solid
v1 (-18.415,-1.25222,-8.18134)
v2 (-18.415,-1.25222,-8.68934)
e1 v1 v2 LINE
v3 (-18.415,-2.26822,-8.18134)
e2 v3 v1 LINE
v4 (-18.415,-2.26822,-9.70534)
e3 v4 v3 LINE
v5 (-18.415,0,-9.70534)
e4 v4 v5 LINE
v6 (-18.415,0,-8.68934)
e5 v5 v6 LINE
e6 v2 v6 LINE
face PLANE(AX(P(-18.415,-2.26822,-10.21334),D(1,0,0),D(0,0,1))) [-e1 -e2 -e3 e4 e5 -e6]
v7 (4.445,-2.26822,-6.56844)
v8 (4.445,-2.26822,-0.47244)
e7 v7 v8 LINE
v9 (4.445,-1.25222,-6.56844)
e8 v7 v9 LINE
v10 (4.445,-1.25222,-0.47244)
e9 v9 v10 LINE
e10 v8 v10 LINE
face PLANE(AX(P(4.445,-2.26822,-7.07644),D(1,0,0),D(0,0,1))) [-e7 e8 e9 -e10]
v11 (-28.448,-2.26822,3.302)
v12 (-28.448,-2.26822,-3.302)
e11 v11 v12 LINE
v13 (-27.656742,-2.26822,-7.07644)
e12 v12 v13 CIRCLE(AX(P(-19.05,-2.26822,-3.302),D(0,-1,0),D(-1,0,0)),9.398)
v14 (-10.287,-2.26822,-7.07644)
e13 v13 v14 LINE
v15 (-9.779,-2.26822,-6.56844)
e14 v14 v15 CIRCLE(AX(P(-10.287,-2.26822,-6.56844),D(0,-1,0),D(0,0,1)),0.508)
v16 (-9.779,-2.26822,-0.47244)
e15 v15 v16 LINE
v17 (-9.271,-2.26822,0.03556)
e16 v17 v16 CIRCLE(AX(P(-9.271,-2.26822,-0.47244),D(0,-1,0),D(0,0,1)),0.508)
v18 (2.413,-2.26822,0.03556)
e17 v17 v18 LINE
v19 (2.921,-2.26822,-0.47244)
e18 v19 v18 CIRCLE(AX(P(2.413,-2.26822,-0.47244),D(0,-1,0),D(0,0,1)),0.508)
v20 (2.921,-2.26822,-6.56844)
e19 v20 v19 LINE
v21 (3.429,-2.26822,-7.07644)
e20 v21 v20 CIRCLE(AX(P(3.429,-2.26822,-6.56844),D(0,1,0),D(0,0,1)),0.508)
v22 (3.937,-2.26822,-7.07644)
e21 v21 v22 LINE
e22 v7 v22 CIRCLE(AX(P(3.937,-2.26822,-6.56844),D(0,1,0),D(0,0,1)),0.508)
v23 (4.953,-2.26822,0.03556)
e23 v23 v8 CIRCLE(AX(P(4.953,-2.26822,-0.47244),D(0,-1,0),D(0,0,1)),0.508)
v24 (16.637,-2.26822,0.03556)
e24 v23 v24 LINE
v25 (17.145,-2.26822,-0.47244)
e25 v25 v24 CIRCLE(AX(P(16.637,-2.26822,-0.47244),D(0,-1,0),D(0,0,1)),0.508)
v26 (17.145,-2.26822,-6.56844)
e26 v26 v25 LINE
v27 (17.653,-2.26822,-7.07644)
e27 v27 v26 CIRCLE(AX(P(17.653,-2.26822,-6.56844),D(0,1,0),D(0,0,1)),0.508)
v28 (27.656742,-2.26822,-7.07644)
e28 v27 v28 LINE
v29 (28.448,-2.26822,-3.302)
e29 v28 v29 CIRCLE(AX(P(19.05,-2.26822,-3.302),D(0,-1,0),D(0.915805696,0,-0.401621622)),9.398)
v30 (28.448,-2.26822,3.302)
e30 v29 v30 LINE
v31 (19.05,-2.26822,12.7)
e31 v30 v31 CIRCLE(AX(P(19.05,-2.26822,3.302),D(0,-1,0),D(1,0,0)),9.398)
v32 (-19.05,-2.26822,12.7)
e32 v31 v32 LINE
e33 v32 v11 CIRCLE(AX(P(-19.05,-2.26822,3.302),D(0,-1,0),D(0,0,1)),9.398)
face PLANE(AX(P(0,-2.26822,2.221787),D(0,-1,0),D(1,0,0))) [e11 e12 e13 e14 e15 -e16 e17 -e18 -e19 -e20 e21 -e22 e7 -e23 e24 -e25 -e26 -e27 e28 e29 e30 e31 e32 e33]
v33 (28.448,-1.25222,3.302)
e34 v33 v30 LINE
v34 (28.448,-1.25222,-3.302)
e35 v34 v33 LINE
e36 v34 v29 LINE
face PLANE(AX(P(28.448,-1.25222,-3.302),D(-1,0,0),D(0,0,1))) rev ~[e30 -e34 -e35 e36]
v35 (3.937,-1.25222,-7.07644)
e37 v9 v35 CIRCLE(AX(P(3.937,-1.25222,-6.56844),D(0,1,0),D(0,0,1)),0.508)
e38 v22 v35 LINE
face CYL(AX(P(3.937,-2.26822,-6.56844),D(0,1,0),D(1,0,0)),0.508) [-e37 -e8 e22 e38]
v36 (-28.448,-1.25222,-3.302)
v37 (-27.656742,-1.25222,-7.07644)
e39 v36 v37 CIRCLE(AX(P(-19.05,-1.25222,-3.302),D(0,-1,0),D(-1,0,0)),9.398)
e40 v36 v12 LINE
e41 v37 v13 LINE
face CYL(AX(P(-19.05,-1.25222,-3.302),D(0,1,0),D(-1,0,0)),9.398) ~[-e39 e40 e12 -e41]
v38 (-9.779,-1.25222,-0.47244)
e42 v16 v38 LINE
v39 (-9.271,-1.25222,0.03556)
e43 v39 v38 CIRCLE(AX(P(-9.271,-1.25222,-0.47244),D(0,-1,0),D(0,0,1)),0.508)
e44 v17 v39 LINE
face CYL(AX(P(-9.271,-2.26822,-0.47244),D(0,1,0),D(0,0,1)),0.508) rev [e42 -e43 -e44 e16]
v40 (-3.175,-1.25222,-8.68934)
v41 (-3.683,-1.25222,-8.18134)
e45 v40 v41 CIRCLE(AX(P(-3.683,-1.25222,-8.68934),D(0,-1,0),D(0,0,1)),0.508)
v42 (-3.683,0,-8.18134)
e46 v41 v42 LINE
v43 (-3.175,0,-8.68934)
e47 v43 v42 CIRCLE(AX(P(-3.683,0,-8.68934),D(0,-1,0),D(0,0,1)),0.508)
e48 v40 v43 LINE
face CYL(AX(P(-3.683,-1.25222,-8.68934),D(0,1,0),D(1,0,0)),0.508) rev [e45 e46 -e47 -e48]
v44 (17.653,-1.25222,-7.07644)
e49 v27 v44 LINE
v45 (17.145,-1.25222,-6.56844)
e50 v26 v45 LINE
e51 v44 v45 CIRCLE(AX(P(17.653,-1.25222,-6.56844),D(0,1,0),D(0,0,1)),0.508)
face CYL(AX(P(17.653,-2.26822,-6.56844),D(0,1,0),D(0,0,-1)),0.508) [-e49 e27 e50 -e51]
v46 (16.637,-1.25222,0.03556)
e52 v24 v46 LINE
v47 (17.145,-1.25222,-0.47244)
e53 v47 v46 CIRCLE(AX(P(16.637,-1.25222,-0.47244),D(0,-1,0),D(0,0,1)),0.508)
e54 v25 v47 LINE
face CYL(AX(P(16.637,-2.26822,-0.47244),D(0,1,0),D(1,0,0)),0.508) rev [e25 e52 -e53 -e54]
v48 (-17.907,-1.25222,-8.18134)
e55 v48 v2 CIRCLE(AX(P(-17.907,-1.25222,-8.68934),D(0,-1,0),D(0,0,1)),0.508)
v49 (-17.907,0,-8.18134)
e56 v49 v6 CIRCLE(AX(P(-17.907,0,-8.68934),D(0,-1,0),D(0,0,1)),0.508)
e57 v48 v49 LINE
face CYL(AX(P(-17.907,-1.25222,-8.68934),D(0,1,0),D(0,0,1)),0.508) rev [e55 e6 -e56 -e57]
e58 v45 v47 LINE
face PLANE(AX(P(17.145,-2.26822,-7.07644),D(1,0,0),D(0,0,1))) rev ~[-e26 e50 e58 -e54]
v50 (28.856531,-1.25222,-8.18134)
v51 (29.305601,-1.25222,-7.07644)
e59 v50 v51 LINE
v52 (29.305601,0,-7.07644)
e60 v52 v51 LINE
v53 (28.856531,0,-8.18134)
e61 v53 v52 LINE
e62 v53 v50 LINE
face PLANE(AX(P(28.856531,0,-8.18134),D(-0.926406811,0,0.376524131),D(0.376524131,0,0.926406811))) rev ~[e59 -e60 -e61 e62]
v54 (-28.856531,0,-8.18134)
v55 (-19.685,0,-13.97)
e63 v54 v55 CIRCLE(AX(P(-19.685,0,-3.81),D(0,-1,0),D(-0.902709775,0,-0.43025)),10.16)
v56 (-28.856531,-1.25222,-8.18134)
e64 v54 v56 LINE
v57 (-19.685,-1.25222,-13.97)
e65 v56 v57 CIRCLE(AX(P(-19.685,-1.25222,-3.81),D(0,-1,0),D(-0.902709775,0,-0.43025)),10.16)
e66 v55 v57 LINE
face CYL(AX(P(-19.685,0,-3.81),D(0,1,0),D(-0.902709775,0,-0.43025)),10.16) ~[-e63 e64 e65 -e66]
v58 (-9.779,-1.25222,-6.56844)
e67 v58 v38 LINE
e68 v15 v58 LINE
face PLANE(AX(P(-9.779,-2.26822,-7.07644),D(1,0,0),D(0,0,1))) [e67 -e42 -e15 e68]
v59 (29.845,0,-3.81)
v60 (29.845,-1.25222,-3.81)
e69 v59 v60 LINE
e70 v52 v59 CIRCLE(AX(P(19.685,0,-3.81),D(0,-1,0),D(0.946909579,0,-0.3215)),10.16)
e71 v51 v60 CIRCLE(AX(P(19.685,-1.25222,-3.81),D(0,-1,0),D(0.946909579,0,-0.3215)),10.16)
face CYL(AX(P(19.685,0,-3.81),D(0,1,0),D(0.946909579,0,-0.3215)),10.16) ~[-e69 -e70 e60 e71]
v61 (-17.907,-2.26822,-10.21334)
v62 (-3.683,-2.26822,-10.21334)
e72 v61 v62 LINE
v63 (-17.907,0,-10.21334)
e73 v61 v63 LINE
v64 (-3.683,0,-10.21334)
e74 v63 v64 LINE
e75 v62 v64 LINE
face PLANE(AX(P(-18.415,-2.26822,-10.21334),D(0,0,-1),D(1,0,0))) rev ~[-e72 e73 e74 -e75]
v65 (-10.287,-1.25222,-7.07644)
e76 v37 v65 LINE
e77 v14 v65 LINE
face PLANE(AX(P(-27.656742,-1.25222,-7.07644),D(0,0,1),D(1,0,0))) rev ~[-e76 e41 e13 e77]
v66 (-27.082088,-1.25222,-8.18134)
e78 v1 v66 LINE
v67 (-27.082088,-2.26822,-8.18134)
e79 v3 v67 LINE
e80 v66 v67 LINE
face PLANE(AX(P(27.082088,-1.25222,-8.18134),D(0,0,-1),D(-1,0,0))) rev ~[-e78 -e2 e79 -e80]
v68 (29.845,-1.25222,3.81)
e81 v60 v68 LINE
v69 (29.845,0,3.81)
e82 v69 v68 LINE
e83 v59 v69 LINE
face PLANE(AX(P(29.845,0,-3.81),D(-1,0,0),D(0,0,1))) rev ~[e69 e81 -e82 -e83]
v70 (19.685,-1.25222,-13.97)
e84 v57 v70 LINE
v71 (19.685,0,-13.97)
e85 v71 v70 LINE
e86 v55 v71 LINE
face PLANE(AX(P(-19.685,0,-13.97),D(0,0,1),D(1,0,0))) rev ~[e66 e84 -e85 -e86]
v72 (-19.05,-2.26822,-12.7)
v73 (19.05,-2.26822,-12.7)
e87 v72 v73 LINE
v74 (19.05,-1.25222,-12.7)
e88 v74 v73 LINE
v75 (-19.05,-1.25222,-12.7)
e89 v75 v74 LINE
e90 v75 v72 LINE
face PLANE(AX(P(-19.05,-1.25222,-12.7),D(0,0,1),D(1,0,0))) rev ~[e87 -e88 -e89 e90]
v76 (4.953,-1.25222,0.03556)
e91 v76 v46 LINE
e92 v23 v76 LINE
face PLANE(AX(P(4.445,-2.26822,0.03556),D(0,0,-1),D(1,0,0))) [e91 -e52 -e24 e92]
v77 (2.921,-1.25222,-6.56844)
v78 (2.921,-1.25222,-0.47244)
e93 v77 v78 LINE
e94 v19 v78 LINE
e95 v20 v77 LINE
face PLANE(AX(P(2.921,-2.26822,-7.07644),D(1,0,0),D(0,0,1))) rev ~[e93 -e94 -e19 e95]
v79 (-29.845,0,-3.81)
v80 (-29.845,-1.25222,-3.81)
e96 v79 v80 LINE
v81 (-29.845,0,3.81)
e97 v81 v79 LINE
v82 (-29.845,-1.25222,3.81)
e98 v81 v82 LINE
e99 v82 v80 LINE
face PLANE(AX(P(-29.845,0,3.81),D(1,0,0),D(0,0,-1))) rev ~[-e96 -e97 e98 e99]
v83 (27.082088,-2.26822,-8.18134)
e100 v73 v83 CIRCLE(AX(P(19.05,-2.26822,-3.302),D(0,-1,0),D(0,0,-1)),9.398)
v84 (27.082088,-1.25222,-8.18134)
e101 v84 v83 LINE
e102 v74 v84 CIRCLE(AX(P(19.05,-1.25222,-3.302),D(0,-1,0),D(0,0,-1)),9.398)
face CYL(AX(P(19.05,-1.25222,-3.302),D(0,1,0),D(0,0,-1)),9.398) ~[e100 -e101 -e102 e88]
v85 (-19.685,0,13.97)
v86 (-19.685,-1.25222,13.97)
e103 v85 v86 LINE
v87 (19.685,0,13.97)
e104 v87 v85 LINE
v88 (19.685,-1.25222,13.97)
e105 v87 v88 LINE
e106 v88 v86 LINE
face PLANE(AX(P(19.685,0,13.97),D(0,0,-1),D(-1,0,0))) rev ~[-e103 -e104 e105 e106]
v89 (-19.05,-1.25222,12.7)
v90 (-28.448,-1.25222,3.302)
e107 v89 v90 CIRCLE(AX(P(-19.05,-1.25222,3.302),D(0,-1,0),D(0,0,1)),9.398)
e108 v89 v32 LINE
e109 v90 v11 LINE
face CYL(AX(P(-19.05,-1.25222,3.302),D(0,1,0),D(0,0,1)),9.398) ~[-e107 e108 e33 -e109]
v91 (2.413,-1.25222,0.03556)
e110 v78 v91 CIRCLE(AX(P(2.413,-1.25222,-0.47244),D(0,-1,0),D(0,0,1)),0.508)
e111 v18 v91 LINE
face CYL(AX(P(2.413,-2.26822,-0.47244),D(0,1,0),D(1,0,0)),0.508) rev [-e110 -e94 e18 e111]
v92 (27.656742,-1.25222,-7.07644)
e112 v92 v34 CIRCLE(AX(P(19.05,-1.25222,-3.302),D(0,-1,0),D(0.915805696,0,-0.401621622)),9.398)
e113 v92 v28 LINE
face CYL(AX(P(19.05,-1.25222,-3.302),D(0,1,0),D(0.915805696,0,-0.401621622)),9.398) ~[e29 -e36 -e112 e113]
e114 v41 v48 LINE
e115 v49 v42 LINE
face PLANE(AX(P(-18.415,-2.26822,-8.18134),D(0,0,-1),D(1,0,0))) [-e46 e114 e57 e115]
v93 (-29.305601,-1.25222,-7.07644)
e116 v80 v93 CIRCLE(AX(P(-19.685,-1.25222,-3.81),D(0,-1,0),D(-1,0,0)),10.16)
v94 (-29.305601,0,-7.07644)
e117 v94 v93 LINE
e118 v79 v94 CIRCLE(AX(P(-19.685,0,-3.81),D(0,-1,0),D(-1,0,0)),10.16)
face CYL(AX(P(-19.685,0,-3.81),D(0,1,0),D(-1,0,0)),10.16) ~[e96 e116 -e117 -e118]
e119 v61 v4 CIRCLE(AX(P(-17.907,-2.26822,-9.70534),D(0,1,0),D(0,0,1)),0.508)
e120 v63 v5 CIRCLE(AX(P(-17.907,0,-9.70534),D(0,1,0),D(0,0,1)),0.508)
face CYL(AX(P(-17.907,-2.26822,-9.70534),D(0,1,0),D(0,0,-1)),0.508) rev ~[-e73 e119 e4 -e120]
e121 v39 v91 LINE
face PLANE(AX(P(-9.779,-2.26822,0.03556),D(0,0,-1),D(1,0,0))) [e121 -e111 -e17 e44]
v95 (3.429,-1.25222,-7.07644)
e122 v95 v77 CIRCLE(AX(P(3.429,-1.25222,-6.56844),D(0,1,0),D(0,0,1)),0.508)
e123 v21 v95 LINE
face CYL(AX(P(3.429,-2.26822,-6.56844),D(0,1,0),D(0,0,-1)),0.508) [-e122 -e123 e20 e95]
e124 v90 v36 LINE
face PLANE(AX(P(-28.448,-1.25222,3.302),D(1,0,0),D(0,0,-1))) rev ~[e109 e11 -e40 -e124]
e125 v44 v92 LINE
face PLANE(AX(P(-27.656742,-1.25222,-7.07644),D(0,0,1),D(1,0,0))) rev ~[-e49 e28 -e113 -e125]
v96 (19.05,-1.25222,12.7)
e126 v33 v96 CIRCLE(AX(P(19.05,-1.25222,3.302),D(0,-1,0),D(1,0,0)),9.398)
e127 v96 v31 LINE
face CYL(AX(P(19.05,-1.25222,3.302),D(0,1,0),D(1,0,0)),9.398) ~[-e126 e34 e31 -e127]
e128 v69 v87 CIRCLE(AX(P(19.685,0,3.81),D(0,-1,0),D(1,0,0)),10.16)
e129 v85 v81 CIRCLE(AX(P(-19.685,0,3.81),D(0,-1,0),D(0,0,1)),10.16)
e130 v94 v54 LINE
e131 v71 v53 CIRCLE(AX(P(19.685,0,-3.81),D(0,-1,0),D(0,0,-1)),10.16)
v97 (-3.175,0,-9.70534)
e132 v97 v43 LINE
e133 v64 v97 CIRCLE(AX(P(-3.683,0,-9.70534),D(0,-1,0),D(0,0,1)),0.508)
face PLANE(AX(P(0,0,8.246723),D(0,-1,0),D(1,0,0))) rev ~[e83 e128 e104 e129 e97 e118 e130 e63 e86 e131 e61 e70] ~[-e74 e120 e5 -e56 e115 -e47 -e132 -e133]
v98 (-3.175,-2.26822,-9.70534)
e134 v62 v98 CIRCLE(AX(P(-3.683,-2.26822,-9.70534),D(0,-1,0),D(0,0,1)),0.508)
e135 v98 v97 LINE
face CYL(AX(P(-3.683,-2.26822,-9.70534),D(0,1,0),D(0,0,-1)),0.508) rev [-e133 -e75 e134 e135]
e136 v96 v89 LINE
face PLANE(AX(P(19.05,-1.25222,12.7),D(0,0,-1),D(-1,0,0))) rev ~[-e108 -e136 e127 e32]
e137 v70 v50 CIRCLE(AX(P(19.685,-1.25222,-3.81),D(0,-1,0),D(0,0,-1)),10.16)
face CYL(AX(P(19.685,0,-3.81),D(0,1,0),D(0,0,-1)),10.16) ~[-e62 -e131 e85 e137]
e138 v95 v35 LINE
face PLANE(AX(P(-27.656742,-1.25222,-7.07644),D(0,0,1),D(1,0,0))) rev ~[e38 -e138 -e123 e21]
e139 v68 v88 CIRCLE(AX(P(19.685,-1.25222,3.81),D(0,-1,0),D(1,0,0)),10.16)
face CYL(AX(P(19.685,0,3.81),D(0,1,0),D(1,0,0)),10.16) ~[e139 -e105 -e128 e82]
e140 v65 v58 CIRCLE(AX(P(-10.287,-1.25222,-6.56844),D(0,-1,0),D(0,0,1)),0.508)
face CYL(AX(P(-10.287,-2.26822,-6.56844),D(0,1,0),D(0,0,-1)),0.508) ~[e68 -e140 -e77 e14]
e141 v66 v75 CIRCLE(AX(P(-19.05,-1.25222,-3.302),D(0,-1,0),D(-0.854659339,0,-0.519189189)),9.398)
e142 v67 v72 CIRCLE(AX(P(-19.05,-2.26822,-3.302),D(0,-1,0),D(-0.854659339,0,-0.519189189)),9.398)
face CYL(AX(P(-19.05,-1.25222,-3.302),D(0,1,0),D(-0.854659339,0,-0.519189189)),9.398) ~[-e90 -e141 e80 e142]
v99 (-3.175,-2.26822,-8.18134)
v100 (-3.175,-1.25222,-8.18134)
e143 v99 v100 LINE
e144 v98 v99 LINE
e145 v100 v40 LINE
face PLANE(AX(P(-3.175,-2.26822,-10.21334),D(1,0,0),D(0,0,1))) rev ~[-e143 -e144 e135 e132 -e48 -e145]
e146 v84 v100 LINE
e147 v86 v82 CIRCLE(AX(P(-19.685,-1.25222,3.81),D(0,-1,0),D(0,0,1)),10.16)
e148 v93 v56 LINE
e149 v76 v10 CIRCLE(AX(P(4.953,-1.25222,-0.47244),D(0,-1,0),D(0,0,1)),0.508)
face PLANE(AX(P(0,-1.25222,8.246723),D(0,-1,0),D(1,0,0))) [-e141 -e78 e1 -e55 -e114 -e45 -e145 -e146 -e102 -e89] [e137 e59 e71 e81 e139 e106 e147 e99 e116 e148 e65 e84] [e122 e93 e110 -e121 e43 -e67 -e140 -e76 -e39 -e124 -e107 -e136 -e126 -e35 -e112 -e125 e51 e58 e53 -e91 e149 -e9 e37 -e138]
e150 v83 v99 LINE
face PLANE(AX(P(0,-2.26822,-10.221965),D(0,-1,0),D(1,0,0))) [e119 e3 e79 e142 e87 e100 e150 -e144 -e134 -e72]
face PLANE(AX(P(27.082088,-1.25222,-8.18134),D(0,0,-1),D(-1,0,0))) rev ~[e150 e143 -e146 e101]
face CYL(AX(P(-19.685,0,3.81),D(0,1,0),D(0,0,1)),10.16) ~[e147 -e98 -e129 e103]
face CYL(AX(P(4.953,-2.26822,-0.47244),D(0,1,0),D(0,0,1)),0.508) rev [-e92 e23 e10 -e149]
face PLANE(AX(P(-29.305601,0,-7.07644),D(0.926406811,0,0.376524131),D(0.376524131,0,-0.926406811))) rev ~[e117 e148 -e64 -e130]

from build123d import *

# Parameters (mm, degrees)
F1_DEPTH = 1.25222
F3_DEPTH = 1.016
F4_W     = 12.7
F4_H     = 7.112
F5_DEPTH = 1.016
F6_W     = 15.24
F6_H     = 2.032
F7_DEPTH = 25.4
F8_R     = 0.508


with BuildPart() as f1:
    # F0 (on Front) → F1 (new body)
    with BuildSketch(Plane.XZ):
        with BuildLine():
            Line((27.6567419321, -7.07644), (29.3056013183, -7.07644))
            ThreePointArc((29.3056013183, -7.07644), (29.7092433479, -5.4653384255), (29.845, -3.81))
            Line((29.845, -3.81), (29.845, 3.81))
            ThreePointArc((29.845, 3.81), (26.8692048969, 10.9942048969), (19.685, 13.97))
            Line((19.685, 13.97), (-19.685, 13.97))
            ThreePointArc((-19.685, 13.97), (-26.8692048969, 10.9942048969), (-29.845, 3.81))
            Line((-29.845, 3.81), (-29.845, -3.81))
            ThreePointArc((-29.845, -3.81), (-29.7092433479, -5.4653384255), (-29.3056013183, -7.07644))
            Line((-29.3056013183, -7.07644), (-27.6567419321, -7.07644))
            ThreePointArc((-27.6567419321, -7.07644), (-28.2480586179, -5.230243154), (-28.448, -3.302))
            Line((-28.448, -3.302), (-28.448, 3.302))
            ThreePointArc((-28.448, 3.302), (-25.6953895296, 9.9473895296), (-19.05, 12.7))
            Line((-19.05, 12.7), (19.05, 12.7))
            ThreePointArc((19.05, 12.7), (25.6953895296, 9.9473895296), (28.448, 3.302))
            Line((28.448, 3.302), (28.448, -3.302))
            ThreePointArc((28.448, -3.302), (28.2480586179, -5.230243154), (27.6567419321, -7.07644))
        make_face()
        with BuildLine():
            Line((-19.685, -13.97), (19.685, -13.97))
            ThreePointArc((19.685, -13.97), (25.1077661576, -12.4018104728), (28.8565313119, -8.18134))
            Line((28.8565313119, -8.18134), (27.0820884684, -8.18134))
            ThreePointArc((27.0820884684, -8.18134), (23.6579478448, -11.4928009779), (19.05, -12.7))
            Line((19.05, -12.7), (-19.05, -12.7))
            ThreePointArc((-19.05, -12.7), (-23.6579478448, -11.4928009779), (-27.0820884684, -8.18134))
            Line((-27.0820884684, -8.18134), (-28.8565313119, -8.18134))
            ThreePointArc((-28.8565313119, -8.18134), (-25.1077661576, -12.4018104728), (-19.685, -13.97))
        make_face()
        with BuildLine():
            Line((-29.3056013183, -7.07644), (-28.8565313119, -8.18134))
            Line((-28.8565313119, -8.18134), (-27.0820884684, -8.18134))
            ThreePointArc((-27.0820884684, -8.18134), (-27.3877377194, -7.6384194588), (-27.6567419321, -7.07644))
            Line((-27.6567419321, -7.07644), (-29.3056013183, -7.07644))
        make_face()
        with BuildLine():
            Line((27.0820884684, -8.18134), (28.8565313119, -8.18134))
            Line((28.8565313119, -8.18134), (29.3056013183, -7.07644))
            Line((29.3056013183, -7.07644), (27.6567419321, -7.07644))
            ThreePointArc((27.6567419321, -7.07644), (27.3877377194, -7.6384194588), (27.0820884684, -8.18134))
        make_face()
        with BuildLine():
            Line((-27.6567419321, -7.07644), (27.6567419321, -7.07644))
            ThreePointArc((27.6567419321, -7.07644), (28.2480586179, -5.230243154), (28.448, -3.302))
            Line((28.448, -3.302), (28.448, 3.302))
            ThreePointArc((28.448, 3.302), (25.6953895296, 9.9473895296), (19.05, 12.7))
            Line((19.05, 12.7), (-19.05, 12.7))
            ThreePointArc((-19.05, 12.7), (-25.6953895296, 9.9473895296), (-28.448, 3.302))
            Line((-28.448, 3.302), (-28.448, -3.302))
            ThreePointArc((-28.448, -3.302), (-28.2480586179, -5.230243154), (-27.6567419321, -7.07644))
        make_face()
        with BuildLine():
            Line((-27.0820884684, -8.18134), (27.0820884684, -8.18134))
            ThreePointArc((27.0820884684, -8.18134), (27.3877377194, -7.6384194588), (27.6567419321, -7.07644))
            Line((27.6567419321, -7.07644), (-27.6567419321, -7.07644))
            ThreePointArc((-27.6567419321, -7.07644), (-27.3877377194, -7.6384194588), (-27.0820884684, -8.18134))
        make_face()
        with BuildLine():
            ThreePointArc((19.05, -12.7), (23.6579478448, -11.4928009779), (27.0820884684, -8.18134))
            Line((27.0820884684, -8.18134), (-27.0820884684, -8.18134))
            ThreePointArc((-27.0820884684, -8.18134), (-23.6579478448, -11.4928009779), (-19.05, -12.7))
            Line((-19.05, -12.7), (19.05, -12.7))
        make_face()
    extrude(amount=F1_DEPTH)

    # F2 (on face) → F3 (join)
    with BuildSketch(Plane.XZ.offset(1.25222)):
        with BuildLine():
            Line((-19.05, -12.7), (19.05, -12.7))
            ThreePointArc((19.05, -12.7), (23.6579478448, -11.4928009779), (27.0820884684, -8.18134))
            Line((27.0820884684, -8.18134), (-27.0820884684, -8.18134))
            ThreePointArc((-27.0820884684, -8.18134), (-23.6579478448, -11.4928009779), (-19.05, -12.7))
        make_face()
        with BuildLine():
            Line((-27.6567419321, -7.07644), (27.6567419321, -7.07644))
            ThreePointArc((27.6567419321, -7.07644), (28.2480586179, -5.230243154), (28.448, -3.302))
            Line((28.448, -3.302), (28.448, 3.302))
            ThreePointArc((28.448, 3.302), (25.6953895296, 9.9473895296), (19.05, 12.7))
            Line((19.05, 12.7), (-19.05, 12.7))
            ThreePointArc((-19.05, 12.7), (-25.6953895296, 9.9473895296), (-28.448, 3.302))
            Line((-28.448, 3.302), (-28.448, -3.302))
            ThreePointArc((-28.448, -3.302), (-28.2480586179, -5.230243154), (-27.6567419321, -7.07644))
        make_face()
    extrude(amount=F3_DEPTH)

    # F4 (on face) → F5 (cut)
    with BuildSketch(Plane.XZ.offset(2.26822)):
        with Locations((-3.429, -3.52044)):
            Rectangle(F4_W, F4_H)
        with Locations((10.795, -3.52044)):
            Rectangle(F4_W, F4_H)
    extrude(amount=-F5_DEPTH, mode=Mode.SUBTRACT)

    # F6 (on face) → F7 (cut)
    with BuildSketch(Plane.XZ.offset(2.26822)):
        with Locations((-10.795, -9.19734)):
            Rectangle(F6_W, F6_H)
    extrude(amount=-F7_DEPTH, mode=Mode.SUBTRACT)

    # F8
    f8_edges = [f1.edges().sort_by_distance(p)[0] for p in [
        (17.145, -1.76022, -7.07644),
        (17.145, -1.76022, 0.03556),
        (4.445, -1.76022, -7.07644),
        (4.445, -1.76022, 0.03556),
        (-9.779, -1.76022, 0.03556),
        (2.921, -1.76022, 0.03556),
        (2.921, -1.76022, -7.07644),
        (-9.779, -1.76022, -7.07644),
        (-3.175, -1.13411, -10.21334),
        (-18.415, -0.62611, -8.18134),
        (-18.415, -1.13411, -10.21334),
        (-3.175, -0.62611, -8.18134),
    ]]
    fillet(f8_edges, radius=F8_R)


solid = f1.part
